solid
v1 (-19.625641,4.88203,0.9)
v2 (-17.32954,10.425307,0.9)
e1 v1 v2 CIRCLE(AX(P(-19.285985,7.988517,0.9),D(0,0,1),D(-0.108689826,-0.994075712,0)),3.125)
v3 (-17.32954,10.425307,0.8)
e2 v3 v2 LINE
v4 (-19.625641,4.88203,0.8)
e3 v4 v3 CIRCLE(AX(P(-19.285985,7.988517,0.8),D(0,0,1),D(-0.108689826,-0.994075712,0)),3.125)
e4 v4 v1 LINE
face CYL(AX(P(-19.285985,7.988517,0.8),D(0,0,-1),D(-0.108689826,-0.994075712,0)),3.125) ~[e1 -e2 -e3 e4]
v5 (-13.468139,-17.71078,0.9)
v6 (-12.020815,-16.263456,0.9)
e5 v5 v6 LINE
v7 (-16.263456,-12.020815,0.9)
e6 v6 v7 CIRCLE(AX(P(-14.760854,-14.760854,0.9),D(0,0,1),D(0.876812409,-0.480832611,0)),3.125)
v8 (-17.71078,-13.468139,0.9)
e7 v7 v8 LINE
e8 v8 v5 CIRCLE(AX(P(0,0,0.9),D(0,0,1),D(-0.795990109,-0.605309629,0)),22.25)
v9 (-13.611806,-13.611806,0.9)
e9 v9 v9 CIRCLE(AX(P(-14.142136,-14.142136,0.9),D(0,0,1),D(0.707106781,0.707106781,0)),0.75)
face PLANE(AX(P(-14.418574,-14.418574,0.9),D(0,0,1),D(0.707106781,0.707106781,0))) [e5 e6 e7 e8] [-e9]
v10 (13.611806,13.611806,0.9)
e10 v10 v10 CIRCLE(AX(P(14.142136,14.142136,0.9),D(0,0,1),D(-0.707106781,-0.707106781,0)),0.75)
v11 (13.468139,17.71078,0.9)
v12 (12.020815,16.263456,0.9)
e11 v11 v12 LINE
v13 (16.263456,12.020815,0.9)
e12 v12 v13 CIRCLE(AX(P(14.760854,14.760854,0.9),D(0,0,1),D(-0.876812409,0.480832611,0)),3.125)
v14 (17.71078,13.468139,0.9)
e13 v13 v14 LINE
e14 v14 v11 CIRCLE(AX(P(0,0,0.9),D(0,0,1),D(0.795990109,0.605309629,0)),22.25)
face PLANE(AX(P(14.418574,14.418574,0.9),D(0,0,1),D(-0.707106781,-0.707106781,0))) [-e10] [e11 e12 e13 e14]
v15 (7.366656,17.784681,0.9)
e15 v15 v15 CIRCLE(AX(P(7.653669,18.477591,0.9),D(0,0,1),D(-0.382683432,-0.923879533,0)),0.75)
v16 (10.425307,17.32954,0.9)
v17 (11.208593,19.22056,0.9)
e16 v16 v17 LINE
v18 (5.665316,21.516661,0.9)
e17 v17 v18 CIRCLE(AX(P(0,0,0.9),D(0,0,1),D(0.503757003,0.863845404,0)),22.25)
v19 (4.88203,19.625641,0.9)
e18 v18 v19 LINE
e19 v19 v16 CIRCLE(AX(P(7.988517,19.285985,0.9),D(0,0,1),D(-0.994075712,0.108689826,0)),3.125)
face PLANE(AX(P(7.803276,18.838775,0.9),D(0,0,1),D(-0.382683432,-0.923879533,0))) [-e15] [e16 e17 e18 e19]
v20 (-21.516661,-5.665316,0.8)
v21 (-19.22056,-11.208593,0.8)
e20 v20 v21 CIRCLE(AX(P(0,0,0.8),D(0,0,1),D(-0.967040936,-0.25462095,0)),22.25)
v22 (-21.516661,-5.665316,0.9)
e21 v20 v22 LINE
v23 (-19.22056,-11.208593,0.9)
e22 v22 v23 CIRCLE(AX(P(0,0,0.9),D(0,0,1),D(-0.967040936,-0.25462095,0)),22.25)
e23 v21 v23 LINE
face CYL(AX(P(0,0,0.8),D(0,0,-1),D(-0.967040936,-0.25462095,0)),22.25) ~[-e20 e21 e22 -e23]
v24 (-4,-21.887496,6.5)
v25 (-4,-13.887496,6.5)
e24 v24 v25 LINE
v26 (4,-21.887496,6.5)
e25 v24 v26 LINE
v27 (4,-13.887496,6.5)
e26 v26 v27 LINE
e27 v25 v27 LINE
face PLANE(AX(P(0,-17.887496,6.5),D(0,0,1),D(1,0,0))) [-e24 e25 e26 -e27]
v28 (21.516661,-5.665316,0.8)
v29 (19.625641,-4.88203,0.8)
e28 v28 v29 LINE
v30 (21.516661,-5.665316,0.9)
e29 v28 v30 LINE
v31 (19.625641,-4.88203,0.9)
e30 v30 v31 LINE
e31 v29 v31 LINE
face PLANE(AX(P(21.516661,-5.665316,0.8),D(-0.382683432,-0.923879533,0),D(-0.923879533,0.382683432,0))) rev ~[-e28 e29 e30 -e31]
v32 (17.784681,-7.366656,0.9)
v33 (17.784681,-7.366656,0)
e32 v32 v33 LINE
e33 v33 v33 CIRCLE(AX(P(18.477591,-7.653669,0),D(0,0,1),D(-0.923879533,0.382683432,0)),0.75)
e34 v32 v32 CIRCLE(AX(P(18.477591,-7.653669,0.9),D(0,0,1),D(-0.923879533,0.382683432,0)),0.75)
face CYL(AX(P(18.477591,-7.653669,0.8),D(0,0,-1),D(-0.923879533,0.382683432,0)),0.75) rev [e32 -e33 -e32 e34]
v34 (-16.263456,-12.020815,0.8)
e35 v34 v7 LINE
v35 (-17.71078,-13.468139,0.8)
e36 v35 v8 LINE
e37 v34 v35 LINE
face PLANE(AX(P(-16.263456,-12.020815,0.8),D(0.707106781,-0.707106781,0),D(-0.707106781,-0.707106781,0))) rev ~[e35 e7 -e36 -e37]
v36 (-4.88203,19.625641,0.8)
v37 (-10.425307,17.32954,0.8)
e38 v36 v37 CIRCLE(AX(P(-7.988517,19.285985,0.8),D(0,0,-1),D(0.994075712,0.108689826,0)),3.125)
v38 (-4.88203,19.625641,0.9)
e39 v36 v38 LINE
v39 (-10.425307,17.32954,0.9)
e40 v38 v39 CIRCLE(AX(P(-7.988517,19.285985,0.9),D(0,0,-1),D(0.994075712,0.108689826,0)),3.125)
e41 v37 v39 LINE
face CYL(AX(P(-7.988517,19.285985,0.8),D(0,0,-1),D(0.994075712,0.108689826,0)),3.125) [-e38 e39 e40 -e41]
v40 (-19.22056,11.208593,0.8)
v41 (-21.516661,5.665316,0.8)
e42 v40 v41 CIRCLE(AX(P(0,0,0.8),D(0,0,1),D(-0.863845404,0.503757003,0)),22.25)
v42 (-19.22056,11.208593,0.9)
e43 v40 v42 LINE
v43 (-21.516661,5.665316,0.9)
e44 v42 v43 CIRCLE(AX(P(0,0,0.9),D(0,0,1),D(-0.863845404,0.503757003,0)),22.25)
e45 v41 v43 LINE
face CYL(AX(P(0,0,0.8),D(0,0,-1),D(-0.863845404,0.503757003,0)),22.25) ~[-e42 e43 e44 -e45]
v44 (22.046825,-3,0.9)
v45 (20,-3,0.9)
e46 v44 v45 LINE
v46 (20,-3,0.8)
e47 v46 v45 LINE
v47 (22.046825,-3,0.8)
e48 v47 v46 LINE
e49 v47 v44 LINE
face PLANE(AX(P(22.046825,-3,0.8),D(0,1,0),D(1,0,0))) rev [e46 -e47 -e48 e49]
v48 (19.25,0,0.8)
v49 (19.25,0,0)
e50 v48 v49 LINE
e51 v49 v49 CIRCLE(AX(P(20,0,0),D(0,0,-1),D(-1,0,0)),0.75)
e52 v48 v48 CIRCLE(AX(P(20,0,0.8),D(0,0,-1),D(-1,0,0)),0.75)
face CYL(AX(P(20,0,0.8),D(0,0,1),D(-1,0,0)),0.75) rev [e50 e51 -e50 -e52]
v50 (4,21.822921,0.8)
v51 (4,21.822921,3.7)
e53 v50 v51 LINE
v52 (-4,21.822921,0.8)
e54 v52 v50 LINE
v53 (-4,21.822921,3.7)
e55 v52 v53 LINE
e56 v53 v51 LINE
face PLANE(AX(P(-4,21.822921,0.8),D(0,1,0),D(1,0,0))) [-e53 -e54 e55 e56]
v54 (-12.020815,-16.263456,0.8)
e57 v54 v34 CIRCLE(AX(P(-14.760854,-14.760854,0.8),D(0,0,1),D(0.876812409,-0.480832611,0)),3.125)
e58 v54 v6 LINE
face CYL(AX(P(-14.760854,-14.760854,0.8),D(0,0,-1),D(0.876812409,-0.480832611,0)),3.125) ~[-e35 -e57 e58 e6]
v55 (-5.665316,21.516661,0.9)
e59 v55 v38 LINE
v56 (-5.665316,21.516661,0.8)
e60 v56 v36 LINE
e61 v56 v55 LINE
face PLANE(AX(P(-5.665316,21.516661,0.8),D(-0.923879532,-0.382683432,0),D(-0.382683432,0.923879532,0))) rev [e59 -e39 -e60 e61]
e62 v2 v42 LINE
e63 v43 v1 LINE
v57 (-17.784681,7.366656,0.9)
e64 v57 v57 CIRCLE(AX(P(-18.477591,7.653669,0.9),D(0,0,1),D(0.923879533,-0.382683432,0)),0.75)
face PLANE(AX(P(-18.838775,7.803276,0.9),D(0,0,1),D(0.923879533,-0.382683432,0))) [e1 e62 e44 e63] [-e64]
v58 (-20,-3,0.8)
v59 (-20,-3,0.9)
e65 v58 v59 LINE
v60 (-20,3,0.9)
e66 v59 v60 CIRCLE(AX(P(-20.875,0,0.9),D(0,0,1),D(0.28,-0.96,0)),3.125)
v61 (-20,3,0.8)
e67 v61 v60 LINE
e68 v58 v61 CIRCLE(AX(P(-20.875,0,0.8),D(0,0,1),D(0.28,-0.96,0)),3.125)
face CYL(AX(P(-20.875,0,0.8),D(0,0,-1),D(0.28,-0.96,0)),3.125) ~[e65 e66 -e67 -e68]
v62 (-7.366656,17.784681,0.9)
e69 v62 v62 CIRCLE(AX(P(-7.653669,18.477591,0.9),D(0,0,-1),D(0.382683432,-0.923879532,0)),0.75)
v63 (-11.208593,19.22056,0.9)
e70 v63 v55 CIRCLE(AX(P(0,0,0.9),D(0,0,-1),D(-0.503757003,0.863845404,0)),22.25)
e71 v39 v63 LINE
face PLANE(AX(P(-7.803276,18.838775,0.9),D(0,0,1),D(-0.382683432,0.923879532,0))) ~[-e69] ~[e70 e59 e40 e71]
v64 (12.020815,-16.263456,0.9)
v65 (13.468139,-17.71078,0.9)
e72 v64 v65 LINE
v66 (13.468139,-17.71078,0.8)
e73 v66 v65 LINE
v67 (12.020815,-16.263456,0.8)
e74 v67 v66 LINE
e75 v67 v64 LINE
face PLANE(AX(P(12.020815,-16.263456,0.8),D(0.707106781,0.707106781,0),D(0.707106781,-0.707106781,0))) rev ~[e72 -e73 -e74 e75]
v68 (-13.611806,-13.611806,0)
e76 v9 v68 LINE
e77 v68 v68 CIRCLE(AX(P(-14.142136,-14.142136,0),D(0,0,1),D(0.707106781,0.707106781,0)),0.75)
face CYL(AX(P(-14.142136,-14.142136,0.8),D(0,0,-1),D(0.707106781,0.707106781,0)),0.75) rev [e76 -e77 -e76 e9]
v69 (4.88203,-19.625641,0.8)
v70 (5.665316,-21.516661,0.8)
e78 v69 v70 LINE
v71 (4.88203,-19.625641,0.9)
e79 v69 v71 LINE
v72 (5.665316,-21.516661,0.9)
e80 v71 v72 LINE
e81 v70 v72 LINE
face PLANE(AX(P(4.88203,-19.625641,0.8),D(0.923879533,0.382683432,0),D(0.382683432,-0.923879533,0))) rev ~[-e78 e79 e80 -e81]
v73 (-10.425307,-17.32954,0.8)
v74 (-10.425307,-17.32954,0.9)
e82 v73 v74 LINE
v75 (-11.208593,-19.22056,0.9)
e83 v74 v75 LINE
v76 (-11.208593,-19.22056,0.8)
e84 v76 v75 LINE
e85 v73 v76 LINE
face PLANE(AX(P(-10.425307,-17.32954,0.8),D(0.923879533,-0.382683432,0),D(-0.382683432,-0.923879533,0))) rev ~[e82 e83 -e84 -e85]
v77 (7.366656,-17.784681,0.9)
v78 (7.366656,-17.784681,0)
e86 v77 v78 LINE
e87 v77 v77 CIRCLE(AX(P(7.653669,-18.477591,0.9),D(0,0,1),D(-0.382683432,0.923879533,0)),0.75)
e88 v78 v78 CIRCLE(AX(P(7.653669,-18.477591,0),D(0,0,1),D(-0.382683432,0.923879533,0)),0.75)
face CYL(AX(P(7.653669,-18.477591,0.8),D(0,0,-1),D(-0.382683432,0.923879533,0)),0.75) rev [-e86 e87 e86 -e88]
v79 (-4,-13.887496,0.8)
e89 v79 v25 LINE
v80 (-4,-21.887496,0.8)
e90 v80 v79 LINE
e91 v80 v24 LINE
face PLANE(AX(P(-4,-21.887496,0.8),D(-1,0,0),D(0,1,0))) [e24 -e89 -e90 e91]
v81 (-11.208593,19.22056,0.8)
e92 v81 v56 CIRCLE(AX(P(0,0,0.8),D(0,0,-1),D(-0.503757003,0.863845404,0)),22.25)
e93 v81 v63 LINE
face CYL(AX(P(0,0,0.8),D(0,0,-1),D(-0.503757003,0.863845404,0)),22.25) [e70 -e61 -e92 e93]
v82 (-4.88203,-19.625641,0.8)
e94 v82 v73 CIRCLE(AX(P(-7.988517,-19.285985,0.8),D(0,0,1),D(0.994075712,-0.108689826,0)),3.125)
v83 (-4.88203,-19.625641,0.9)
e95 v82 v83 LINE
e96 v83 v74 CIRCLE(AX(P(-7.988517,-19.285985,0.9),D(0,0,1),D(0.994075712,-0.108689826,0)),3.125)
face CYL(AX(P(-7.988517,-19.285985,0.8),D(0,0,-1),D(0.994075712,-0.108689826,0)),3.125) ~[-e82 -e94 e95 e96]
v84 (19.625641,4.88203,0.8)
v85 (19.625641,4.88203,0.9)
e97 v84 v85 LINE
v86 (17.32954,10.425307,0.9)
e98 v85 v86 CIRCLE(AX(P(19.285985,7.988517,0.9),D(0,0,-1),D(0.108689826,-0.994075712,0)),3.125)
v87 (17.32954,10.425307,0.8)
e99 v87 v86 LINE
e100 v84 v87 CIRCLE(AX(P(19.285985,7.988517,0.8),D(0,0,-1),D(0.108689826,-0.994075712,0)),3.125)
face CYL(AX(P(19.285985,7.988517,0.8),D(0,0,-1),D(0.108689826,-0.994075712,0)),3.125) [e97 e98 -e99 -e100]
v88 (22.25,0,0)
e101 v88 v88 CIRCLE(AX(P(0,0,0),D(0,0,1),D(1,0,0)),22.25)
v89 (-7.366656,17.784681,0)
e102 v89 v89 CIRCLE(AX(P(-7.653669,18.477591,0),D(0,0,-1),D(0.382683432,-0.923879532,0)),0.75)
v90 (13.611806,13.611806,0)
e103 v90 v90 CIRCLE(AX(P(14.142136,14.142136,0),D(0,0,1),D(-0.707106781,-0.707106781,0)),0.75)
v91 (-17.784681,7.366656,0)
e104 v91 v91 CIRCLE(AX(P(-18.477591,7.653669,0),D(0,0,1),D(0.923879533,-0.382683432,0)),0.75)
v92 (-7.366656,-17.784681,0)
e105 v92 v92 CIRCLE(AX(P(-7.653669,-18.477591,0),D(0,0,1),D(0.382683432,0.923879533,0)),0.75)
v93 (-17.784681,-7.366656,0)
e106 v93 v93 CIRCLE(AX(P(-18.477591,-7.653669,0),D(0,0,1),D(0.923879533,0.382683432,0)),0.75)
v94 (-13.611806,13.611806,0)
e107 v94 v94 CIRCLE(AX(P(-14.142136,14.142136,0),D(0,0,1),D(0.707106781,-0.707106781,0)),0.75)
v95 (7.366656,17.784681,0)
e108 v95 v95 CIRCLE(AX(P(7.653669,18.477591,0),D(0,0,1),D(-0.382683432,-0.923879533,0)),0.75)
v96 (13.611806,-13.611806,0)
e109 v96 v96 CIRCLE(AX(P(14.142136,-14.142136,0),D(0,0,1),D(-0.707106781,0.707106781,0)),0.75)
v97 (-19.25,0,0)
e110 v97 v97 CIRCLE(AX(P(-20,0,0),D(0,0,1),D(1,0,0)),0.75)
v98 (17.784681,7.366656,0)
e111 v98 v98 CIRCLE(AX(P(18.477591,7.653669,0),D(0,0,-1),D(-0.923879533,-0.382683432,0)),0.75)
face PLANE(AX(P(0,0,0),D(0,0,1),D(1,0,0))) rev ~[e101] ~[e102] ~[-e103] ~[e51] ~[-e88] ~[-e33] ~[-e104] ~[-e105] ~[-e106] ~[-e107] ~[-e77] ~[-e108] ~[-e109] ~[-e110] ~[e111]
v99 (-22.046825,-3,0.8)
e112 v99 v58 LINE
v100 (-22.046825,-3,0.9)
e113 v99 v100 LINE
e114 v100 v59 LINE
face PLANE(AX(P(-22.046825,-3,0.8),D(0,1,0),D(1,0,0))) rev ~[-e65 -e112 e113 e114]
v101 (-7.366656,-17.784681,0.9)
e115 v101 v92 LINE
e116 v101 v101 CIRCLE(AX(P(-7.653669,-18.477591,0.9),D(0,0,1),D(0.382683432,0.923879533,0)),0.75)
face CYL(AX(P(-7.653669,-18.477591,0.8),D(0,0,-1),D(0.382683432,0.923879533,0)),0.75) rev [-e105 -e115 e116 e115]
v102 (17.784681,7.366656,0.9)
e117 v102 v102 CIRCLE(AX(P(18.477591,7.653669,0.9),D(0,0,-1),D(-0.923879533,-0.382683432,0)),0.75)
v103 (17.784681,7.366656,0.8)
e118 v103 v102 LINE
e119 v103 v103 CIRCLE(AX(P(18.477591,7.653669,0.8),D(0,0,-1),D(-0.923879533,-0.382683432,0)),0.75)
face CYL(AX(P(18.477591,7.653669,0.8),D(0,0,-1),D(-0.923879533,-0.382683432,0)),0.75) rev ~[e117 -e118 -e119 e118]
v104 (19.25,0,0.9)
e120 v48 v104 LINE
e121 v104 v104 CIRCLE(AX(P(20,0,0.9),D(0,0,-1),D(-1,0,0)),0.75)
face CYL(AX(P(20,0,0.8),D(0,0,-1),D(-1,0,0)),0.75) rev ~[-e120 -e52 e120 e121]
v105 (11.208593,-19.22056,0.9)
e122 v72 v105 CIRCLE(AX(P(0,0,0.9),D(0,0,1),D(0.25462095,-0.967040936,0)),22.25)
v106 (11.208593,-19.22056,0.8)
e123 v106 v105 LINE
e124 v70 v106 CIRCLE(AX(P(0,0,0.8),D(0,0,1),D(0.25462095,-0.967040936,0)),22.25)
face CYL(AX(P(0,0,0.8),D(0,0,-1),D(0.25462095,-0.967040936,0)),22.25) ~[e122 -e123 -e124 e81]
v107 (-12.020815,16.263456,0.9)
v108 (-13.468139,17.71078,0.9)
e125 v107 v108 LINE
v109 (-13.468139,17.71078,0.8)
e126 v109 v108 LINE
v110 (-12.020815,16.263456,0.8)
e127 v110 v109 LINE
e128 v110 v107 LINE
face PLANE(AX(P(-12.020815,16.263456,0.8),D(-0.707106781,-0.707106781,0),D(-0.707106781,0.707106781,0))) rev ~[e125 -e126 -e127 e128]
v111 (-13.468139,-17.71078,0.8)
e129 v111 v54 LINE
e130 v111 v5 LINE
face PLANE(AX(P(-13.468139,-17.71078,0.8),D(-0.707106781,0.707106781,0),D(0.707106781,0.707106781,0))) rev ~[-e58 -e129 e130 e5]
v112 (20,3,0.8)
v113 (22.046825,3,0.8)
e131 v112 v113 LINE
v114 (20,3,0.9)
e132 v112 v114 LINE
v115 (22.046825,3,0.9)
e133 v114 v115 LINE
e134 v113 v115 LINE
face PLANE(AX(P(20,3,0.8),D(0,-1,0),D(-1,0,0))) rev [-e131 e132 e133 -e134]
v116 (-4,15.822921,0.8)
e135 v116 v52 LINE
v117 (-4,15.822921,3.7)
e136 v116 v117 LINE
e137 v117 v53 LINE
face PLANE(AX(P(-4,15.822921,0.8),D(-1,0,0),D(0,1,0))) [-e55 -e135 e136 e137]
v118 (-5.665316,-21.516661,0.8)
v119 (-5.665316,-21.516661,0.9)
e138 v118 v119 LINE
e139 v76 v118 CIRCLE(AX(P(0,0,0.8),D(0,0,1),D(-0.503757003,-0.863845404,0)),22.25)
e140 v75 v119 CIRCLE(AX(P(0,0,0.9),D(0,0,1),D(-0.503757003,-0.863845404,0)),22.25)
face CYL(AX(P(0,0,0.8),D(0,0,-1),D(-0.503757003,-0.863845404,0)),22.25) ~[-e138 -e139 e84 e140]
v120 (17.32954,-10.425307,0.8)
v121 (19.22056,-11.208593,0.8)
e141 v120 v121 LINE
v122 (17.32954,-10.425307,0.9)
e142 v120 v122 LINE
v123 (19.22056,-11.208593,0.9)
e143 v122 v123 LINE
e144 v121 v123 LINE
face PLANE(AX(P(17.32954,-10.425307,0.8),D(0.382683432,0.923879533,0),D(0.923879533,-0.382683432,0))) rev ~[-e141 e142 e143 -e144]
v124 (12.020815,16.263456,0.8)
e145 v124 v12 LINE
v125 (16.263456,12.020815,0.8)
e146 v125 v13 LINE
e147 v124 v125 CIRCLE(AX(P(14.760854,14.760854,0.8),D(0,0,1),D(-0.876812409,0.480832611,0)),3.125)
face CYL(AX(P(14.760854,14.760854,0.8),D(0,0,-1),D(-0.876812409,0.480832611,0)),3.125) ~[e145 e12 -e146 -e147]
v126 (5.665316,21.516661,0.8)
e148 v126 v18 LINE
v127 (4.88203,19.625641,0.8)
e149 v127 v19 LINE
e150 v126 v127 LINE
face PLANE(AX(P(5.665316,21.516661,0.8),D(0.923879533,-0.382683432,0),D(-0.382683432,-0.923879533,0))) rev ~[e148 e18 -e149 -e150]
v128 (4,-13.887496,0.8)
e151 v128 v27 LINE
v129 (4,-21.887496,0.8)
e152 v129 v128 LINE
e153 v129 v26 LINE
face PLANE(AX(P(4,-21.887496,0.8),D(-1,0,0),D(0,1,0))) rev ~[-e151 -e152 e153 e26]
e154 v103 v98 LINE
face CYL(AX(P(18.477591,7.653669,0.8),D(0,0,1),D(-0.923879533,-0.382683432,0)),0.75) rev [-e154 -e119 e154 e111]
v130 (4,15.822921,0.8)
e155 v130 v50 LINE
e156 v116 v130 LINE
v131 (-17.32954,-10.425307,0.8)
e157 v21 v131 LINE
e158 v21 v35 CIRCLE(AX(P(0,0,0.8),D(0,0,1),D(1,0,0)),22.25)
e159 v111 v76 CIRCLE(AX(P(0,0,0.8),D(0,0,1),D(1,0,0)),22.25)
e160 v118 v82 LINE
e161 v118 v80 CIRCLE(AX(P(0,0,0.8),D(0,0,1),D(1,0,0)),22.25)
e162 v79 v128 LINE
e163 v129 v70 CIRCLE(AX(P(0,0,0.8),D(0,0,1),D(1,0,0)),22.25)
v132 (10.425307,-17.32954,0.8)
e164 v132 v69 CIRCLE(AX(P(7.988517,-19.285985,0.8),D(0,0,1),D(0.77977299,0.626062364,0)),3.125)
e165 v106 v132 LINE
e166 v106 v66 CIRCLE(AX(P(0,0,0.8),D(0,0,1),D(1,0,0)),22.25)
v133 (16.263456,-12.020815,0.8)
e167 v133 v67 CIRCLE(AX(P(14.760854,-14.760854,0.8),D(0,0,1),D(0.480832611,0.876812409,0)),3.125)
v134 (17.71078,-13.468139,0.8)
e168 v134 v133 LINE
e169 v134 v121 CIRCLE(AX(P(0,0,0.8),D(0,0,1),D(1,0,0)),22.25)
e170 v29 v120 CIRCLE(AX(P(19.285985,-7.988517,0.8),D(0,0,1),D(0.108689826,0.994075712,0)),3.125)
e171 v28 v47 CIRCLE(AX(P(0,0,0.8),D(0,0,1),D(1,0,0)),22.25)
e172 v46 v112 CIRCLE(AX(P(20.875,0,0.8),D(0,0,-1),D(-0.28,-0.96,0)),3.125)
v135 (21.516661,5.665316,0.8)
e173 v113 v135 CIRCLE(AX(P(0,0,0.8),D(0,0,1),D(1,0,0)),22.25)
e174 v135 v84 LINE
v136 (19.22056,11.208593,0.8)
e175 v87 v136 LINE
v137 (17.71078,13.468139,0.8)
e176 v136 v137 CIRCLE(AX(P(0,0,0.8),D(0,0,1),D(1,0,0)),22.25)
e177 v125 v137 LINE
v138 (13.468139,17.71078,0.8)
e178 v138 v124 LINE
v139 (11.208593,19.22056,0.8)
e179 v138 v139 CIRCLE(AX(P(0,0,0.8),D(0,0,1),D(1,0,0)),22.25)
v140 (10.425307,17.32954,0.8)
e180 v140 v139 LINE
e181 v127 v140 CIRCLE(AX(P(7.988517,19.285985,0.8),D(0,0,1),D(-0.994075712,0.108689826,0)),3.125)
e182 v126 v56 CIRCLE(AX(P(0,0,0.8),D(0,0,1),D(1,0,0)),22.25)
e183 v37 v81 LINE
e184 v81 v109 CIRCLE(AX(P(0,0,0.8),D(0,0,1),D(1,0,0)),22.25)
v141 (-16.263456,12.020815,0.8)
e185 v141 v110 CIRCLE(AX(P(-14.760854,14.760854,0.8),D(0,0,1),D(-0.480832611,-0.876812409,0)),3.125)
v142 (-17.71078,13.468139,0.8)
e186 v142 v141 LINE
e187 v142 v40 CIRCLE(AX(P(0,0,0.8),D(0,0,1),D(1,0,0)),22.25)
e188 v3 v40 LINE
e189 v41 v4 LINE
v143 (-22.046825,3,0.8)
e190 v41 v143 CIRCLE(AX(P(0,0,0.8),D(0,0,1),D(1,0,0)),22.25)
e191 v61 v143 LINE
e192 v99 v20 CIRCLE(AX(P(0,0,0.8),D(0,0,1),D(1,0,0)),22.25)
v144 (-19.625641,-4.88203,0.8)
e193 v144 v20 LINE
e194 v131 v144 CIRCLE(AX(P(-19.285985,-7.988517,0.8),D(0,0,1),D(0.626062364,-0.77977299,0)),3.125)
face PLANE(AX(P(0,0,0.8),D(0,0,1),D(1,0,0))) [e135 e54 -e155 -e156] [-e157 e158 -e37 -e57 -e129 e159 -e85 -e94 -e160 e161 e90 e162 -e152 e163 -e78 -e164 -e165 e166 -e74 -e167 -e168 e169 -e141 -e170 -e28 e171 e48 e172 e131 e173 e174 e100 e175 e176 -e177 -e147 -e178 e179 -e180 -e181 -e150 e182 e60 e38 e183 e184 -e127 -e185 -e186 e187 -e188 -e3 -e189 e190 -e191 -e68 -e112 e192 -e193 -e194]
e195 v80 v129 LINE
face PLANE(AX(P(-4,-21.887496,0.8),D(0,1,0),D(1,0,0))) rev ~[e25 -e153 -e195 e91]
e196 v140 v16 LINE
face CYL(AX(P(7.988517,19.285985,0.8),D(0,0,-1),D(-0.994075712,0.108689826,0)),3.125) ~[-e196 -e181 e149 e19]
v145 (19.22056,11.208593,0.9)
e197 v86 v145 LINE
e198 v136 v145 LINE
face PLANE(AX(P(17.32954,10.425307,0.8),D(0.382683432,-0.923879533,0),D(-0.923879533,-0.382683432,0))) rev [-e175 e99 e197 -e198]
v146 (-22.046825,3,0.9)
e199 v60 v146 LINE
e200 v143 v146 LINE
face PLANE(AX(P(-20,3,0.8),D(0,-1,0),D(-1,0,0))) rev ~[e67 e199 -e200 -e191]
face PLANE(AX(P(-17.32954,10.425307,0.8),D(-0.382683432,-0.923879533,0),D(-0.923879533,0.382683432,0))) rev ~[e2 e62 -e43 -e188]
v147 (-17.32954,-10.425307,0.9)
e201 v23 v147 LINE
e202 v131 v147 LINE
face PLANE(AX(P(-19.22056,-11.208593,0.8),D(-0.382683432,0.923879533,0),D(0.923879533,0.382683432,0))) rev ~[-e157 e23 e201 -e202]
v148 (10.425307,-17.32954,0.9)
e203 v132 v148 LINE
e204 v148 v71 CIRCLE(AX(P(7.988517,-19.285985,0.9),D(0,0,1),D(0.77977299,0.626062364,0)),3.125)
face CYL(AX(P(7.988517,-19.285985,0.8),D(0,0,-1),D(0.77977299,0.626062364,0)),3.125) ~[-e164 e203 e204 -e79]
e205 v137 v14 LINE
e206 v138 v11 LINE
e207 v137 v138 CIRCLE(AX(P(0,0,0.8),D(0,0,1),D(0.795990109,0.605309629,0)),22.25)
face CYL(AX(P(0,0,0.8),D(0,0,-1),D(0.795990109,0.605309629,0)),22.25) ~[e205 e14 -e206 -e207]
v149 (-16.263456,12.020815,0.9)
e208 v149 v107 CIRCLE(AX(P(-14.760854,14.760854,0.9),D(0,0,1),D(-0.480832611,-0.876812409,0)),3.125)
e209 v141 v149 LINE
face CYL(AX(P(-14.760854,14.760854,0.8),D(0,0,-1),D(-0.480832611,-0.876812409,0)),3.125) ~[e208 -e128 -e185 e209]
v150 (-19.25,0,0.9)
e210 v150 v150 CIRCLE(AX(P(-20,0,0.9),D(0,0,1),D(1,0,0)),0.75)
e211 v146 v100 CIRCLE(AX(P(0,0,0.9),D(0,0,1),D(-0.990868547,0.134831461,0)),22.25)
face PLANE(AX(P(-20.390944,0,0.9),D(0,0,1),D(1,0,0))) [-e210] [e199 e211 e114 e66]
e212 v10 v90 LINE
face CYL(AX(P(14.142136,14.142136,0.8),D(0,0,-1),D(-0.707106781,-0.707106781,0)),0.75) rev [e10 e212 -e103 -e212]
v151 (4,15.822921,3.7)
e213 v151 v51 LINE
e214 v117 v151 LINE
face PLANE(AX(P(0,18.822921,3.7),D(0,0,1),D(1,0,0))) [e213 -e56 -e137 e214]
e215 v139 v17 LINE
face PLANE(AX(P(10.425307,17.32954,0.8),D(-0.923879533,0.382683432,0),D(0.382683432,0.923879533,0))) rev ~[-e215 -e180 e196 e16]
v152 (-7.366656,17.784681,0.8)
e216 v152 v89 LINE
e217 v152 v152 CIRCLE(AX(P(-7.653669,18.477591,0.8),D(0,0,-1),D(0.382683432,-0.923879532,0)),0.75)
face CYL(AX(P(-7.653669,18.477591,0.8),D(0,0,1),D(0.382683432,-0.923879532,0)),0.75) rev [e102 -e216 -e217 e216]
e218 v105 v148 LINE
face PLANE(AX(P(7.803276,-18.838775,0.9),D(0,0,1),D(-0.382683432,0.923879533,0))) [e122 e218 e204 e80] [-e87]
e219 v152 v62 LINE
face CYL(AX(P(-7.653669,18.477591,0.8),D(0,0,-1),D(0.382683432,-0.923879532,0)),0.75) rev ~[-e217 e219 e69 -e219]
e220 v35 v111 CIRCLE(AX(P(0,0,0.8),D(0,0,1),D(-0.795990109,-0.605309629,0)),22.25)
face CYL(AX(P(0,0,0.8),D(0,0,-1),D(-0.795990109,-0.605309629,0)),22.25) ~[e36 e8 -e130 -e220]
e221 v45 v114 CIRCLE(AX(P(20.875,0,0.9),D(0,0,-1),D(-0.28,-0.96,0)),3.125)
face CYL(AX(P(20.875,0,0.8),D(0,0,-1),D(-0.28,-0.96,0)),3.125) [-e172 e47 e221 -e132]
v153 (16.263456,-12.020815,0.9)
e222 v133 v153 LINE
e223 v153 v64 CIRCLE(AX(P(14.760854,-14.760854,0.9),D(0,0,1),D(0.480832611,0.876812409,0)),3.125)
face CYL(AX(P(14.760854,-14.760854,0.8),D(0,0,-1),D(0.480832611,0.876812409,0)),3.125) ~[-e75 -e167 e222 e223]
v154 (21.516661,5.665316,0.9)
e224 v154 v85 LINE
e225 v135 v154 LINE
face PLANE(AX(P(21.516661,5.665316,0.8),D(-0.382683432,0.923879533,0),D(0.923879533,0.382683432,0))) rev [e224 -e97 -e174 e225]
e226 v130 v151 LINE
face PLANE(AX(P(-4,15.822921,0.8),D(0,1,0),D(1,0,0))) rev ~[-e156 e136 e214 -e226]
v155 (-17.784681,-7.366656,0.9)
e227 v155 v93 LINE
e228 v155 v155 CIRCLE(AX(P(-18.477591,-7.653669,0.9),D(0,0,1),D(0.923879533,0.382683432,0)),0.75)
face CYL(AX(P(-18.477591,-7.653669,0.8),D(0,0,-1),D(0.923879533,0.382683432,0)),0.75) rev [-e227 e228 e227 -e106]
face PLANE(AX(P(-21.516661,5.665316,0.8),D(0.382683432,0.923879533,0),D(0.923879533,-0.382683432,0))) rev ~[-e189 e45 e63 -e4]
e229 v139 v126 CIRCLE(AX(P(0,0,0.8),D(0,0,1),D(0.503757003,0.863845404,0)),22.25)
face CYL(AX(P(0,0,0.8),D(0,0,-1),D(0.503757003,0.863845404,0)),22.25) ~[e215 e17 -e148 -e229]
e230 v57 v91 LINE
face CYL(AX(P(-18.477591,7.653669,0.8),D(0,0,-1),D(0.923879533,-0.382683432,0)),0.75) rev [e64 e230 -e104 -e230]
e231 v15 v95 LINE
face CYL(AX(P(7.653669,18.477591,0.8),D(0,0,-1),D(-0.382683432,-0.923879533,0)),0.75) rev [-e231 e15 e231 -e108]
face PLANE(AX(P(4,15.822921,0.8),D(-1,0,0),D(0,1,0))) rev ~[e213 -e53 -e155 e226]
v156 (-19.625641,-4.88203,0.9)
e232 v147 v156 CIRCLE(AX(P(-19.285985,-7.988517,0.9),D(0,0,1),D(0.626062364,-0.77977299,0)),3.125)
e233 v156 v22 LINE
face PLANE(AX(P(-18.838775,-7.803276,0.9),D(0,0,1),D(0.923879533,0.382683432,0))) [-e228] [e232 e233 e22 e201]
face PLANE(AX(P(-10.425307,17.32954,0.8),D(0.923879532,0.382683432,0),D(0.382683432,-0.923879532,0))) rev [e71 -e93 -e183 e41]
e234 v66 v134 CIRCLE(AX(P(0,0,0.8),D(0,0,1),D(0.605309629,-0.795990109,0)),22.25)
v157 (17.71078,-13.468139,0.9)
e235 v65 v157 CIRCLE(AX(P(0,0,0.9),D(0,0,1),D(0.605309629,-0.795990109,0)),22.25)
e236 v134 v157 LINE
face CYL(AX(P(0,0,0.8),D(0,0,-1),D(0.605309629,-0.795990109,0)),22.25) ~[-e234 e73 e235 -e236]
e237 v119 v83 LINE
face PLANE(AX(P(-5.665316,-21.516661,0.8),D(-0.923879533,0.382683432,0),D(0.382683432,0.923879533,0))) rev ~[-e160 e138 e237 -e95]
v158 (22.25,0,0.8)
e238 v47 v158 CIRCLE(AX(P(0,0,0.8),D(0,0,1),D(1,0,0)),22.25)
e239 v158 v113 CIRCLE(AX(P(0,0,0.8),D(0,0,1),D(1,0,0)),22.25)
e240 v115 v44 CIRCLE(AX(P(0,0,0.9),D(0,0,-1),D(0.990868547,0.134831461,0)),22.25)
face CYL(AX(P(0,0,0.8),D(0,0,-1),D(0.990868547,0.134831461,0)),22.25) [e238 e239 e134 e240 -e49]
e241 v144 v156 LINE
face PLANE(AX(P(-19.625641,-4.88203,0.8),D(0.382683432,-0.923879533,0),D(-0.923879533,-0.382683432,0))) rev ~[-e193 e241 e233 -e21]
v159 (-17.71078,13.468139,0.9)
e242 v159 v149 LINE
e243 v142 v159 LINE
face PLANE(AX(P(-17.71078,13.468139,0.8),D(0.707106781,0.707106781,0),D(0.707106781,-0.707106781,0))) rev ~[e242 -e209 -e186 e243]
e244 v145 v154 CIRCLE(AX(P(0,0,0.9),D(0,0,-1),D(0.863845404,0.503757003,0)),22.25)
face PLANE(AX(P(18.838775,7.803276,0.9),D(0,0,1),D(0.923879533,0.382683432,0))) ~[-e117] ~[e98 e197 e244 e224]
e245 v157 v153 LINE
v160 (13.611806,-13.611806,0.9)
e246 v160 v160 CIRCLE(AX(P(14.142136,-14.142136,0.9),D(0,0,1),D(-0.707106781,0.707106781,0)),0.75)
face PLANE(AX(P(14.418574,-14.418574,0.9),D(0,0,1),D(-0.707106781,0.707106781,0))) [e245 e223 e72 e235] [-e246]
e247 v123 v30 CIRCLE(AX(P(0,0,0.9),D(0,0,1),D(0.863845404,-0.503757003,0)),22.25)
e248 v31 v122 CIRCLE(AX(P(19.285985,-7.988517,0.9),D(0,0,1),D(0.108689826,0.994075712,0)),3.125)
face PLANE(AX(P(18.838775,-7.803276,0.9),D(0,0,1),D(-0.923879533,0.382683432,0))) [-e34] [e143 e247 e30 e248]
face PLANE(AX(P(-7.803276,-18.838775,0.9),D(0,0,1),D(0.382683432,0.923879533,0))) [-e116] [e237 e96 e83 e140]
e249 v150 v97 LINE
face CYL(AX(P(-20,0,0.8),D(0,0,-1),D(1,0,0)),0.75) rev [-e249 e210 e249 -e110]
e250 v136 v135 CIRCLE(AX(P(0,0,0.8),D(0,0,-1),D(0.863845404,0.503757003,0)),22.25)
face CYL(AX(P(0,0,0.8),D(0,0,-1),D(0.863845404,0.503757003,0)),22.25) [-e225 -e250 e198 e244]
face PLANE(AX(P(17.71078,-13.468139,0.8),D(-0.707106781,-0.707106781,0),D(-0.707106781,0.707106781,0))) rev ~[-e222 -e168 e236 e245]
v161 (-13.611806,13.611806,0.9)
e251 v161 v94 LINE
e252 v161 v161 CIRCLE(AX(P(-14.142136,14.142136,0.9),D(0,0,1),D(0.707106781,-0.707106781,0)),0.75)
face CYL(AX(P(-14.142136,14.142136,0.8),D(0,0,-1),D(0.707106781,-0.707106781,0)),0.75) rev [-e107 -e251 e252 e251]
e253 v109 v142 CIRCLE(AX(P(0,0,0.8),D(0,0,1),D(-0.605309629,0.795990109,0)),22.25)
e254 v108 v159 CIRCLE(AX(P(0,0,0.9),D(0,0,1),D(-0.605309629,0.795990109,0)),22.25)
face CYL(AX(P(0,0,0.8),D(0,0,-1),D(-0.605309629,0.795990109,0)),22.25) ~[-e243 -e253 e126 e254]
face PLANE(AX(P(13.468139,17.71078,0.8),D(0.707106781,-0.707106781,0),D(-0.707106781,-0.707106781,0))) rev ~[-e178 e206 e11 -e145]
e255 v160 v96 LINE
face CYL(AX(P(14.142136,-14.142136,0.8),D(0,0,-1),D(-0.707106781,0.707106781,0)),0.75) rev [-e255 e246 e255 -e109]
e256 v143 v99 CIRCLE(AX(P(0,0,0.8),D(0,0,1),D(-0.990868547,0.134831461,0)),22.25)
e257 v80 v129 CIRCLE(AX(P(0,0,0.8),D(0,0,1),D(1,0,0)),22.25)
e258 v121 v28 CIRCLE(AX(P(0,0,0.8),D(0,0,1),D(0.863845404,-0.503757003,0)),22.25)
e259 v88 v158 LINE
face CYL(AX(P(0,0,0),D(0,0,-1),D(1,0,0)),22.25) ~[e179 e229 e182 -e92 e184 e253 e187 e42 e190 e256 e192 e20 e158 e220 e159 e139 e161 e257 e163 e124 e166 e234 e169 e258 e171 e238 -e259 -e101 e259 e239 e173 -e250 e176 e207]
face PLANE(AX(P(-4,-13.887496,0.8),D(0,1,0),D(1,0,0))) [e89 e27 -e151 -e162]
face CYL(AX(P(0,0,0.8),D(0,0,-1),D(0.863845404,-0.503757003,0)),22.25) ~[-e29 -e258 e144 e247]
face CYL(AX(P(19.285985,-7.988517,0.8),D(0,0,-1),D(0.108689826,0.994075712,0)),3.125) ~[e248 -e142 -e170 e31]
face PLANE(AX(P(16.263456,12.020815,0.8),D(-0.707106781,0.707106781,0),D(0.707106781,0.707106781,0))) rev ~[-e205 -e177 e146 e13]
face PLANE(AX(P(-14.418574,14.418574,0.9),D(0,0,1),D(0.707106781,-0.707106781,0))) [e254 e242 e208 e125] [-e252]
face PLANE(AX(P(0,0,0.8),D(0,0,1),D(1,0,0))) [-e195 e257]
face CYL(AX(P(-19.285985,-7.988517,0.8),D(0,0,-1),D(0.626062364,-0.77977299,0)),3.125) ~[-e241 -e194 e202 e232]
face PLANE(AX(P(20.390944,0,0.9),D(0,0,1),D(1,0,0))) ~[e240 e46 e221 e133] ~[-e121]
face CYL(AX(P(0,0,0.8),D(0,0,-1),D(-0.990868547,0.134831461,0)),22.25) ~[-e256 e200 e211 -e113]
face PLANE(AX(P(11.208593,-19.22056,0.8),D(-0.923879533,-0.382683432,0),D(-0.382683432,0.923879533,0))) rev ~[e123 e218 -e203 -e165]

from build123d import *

# Parameters (mm, degrees)
F0_R             = 22.25
F1_DEPTH         = 0.8
F2_W             = 8
F2_H             = 8
F3_DEPTH         = 5.7
F4_W             = 8
F4_H             = 6
F5_DEPTH         = 2.9
F6_R             = 0.75
F7_DEPTH         = 0.8
F7_COPIES_COUNT  = 4
F7_COPIES_ANGLE  = 67.5
F7_COPIES1_COUNT = 4
F7_COPIES1_ANGLE = 337.5
F7_COPIES2_COUNT = 3
F7_COPIES2_ANGLE = 315
F7_COPIES3_COUNT = 3
F7_COPIES3_ANGLE = 225
F8_DEPTH         = 0.1
F8_COPIES_COUNT  = 4
F8_COPIES_ANGLE  = 67.5
F8_COPIES1_COUNT = 4
F8_COPIES1_ANGLE = 337.5
F8_COPIES2_COUNT = 3
F8_COPIES2_ANGLE = 315
F8_COPIES3_COUNT = 3
F8_COPIES3_ANGLE = 225


# Not quite as in the source:
# - after a boolean that leaves OpenCascade's solid faulty, fix() repairs it
# - a feature of the source that left no trace in its solid (it failed there, or was rolled back) is left out
# - a pattern or mirror of a feature is missing from the dataset's text; its kind, count and spacing are read off the source's solid


with BuildPart() as f1:
    # F0 (on Top) → F1 (new body)
    with BuildSketch(Plane.XY):
        Circle(F0_R)
    extrude(amount=F1_DEPTH)

    # F2 (on face) → F3 (join)
    with BuildSketch(Plane.XY.offset(0.8)):
        with Locations((0, -17.8874964306)):
            Rectangle(F2_W, F2_H)
    extrude(amount=F3_DEPTH)

    # F4 (on face) → F5 (join)
    with BuildSketch(Plane.XY.offset(0.8)):
        with Locations((0, 18.82292144)):
            Rectangle(F4_W, F4_H)
    extrude(amount=F5_DEPTH)

    # F6 (on face) → F7 (cut, through all)
    with BuildSketch(Plane.XY.offset(0.8)):
        with Locations((-20, 0)):
            Circle(F6_R)
    f7 = extrude(amount=-F7_DEPTH, mode=Mode.SUBTRACT)

    # F7_copies: F7 ×4 about axis
    f7_copies_axis = Axis((0, 0, 0), (0, 0, 1))
    for i in range(1, F7_COPIES_COUNT):
        add(f7.rotate(f7_copies_axis, i * F7_COPIES_ANGLE / (F7_COPIES_COUNT - 1)), mode=Mode.SUBTRACT)

    # F7_copies1: F7 ×4 about axis
    f7_copies1_axis = Axis((0, 0, 0), (0, 0, 1))
    for i in range(1, F7_COPIES1_COUNT):
        add(f7.rotate(f7_copies1_axis, i * F7_COPIES1_ANGLE / (F7_COPIES1_COUNT - 1)), mode=Mode.SUBTRACT)

    # F7_copies2: F7 ×3 about axis
    f7_copies2_axis = Axis((0, 0, 0), (0, 0, 1))
    for i in range(1, F7_COPIES2_COUNT):
        add(f7.rotate(f7_copies2_axis, i * F7_COPIES2_ANGLE / (F7_COPIES2_COUNT - 1)), mode=Mode.SUBTRACT)

    # F7_copies3: F7 ×3 about axis
    f7_copies3_axis = Axis((0, 0, 0), (0, 0, -1))
    for i in range(1, F7_COPIES3_COUNT):
        add(f7.rotate(f7_copies3_axis, i * F7_COPIES3_ANGLE / (F7_COPIES3_COUNT - 1)), mode=Mode.SUBTRACT)

    # F7_copies4: F7 across plane
    add(f7.mirror(Plane(origin=(0, 0, 0), x_dir=(-0.195090322, 0.9807852804, 0), z_dir=(0.9807852804, 0.195090322, 0))), mode=Mode.SUBTRACT)

    # F7_copies5: F7 across plane
    add(f7.mirror(Plane(origin=(0, 0, 0), x_dir=(0.8314696123, -0.555570233, 0), z_dir=(0.555570233, 0.8314696123, 0))), mode=Mode.SUBTRACT)

    # F7_copies6: F7 across plane
    add(f7.mirror(Plane(origin=(0, 0, 0), x_dir=(0, 0, 1), z_dir=(1, 0, 0))), mode=Mode.SUBTRACT)

    # F6 (on face) → F8 (join)
    with BuildSketch(Plane.XY.offset(0.8)):
        with BuildLine():
            Line((-22.0468251683, -3), (-20, -3))
            ThreePointArc((-20, -3), (-17.75, 0), (-20, 3))
            Line((-20, 3), (-22.0468251683, 3))
            ThreePointArc((-22.0468251683, 3), (-22.25, 0), (-22.0468251683, -3))
        make_face()
        with Locations((-20, 0)):
            Circle(F6_R, mode=Mode.SUBTRACT)
    f8 = extrude(amount=F8_DEPTH)

    # F8_copies: F8 ×4 about axis
    f8_copies_axis = Axis((0, 0, 0), (0, 0, 1))
    for i in range(1, F8_COPIES_COUNT):
        add(f8.rotate(f8_copies_axis, i * F8_COPIES_ANGLE / (F8_COPIES_COUNT - 1)))

    # F8_copies1: F8 ×4 about axis
    f8_copies1_axis = Axis((0, 0, 0), (0, 0, 1))
    for i in range(1, F8_COPIES1_COUNT):
        add(f8.rotate(f8_copies1_axis, i * F8_COPIES1_ANGLE / (F8_COPIES1_COUNT - 1)))

    # F8_copies2: F8 ×3 about axis
    f8_copies2_axis = Axis((0, 0, 0), (0, 0, 1))
    for i in range(1, F8_COPIES2_COUNT):
        add(f8.rotate(f8_copies2_axis, i * F8_COPIES2_ANGLE / (F8_COPIES2_COUNT - 1)))

    # F8_copies3: F8 ×3 about axis
    f8_copies3_axis = Axis((0, 0, 0), (0, 0, -1))
    for i in range(1, F8_COPIES3_COUNT):
        add(f8.rotate(f8_copies3_axis, i * F8_COPIES3_ANGLE / (F8_COPIES3_COUNT - 1)))

    # F8_copies4: F8 across plane
    add(f8.mirror(Plane(origin=(0, 0, 0), x_dir=(-0.195090322, 0.9807852804, 0), z_dir=(0.9807852804, 0.195090322, 0))))

    # F8_copies5: F8 across plane
    add(f8.mirror(Plane(origin=(0, 0, 0), x_dir=(0.8314696123, -0.555570233, 0), z_dir=(0.555570233, 0.8314696123, 0))))

    add(f1.part.fix(), mode=Mode.REPLACE)

    # F8_copies6: F8 across plane
    add(f8.mirror(Plane(origin=(0, 0, 0), x_dir=(0, 0, 1), z_dir=(1, 0, 0))))


solid = f1.part
